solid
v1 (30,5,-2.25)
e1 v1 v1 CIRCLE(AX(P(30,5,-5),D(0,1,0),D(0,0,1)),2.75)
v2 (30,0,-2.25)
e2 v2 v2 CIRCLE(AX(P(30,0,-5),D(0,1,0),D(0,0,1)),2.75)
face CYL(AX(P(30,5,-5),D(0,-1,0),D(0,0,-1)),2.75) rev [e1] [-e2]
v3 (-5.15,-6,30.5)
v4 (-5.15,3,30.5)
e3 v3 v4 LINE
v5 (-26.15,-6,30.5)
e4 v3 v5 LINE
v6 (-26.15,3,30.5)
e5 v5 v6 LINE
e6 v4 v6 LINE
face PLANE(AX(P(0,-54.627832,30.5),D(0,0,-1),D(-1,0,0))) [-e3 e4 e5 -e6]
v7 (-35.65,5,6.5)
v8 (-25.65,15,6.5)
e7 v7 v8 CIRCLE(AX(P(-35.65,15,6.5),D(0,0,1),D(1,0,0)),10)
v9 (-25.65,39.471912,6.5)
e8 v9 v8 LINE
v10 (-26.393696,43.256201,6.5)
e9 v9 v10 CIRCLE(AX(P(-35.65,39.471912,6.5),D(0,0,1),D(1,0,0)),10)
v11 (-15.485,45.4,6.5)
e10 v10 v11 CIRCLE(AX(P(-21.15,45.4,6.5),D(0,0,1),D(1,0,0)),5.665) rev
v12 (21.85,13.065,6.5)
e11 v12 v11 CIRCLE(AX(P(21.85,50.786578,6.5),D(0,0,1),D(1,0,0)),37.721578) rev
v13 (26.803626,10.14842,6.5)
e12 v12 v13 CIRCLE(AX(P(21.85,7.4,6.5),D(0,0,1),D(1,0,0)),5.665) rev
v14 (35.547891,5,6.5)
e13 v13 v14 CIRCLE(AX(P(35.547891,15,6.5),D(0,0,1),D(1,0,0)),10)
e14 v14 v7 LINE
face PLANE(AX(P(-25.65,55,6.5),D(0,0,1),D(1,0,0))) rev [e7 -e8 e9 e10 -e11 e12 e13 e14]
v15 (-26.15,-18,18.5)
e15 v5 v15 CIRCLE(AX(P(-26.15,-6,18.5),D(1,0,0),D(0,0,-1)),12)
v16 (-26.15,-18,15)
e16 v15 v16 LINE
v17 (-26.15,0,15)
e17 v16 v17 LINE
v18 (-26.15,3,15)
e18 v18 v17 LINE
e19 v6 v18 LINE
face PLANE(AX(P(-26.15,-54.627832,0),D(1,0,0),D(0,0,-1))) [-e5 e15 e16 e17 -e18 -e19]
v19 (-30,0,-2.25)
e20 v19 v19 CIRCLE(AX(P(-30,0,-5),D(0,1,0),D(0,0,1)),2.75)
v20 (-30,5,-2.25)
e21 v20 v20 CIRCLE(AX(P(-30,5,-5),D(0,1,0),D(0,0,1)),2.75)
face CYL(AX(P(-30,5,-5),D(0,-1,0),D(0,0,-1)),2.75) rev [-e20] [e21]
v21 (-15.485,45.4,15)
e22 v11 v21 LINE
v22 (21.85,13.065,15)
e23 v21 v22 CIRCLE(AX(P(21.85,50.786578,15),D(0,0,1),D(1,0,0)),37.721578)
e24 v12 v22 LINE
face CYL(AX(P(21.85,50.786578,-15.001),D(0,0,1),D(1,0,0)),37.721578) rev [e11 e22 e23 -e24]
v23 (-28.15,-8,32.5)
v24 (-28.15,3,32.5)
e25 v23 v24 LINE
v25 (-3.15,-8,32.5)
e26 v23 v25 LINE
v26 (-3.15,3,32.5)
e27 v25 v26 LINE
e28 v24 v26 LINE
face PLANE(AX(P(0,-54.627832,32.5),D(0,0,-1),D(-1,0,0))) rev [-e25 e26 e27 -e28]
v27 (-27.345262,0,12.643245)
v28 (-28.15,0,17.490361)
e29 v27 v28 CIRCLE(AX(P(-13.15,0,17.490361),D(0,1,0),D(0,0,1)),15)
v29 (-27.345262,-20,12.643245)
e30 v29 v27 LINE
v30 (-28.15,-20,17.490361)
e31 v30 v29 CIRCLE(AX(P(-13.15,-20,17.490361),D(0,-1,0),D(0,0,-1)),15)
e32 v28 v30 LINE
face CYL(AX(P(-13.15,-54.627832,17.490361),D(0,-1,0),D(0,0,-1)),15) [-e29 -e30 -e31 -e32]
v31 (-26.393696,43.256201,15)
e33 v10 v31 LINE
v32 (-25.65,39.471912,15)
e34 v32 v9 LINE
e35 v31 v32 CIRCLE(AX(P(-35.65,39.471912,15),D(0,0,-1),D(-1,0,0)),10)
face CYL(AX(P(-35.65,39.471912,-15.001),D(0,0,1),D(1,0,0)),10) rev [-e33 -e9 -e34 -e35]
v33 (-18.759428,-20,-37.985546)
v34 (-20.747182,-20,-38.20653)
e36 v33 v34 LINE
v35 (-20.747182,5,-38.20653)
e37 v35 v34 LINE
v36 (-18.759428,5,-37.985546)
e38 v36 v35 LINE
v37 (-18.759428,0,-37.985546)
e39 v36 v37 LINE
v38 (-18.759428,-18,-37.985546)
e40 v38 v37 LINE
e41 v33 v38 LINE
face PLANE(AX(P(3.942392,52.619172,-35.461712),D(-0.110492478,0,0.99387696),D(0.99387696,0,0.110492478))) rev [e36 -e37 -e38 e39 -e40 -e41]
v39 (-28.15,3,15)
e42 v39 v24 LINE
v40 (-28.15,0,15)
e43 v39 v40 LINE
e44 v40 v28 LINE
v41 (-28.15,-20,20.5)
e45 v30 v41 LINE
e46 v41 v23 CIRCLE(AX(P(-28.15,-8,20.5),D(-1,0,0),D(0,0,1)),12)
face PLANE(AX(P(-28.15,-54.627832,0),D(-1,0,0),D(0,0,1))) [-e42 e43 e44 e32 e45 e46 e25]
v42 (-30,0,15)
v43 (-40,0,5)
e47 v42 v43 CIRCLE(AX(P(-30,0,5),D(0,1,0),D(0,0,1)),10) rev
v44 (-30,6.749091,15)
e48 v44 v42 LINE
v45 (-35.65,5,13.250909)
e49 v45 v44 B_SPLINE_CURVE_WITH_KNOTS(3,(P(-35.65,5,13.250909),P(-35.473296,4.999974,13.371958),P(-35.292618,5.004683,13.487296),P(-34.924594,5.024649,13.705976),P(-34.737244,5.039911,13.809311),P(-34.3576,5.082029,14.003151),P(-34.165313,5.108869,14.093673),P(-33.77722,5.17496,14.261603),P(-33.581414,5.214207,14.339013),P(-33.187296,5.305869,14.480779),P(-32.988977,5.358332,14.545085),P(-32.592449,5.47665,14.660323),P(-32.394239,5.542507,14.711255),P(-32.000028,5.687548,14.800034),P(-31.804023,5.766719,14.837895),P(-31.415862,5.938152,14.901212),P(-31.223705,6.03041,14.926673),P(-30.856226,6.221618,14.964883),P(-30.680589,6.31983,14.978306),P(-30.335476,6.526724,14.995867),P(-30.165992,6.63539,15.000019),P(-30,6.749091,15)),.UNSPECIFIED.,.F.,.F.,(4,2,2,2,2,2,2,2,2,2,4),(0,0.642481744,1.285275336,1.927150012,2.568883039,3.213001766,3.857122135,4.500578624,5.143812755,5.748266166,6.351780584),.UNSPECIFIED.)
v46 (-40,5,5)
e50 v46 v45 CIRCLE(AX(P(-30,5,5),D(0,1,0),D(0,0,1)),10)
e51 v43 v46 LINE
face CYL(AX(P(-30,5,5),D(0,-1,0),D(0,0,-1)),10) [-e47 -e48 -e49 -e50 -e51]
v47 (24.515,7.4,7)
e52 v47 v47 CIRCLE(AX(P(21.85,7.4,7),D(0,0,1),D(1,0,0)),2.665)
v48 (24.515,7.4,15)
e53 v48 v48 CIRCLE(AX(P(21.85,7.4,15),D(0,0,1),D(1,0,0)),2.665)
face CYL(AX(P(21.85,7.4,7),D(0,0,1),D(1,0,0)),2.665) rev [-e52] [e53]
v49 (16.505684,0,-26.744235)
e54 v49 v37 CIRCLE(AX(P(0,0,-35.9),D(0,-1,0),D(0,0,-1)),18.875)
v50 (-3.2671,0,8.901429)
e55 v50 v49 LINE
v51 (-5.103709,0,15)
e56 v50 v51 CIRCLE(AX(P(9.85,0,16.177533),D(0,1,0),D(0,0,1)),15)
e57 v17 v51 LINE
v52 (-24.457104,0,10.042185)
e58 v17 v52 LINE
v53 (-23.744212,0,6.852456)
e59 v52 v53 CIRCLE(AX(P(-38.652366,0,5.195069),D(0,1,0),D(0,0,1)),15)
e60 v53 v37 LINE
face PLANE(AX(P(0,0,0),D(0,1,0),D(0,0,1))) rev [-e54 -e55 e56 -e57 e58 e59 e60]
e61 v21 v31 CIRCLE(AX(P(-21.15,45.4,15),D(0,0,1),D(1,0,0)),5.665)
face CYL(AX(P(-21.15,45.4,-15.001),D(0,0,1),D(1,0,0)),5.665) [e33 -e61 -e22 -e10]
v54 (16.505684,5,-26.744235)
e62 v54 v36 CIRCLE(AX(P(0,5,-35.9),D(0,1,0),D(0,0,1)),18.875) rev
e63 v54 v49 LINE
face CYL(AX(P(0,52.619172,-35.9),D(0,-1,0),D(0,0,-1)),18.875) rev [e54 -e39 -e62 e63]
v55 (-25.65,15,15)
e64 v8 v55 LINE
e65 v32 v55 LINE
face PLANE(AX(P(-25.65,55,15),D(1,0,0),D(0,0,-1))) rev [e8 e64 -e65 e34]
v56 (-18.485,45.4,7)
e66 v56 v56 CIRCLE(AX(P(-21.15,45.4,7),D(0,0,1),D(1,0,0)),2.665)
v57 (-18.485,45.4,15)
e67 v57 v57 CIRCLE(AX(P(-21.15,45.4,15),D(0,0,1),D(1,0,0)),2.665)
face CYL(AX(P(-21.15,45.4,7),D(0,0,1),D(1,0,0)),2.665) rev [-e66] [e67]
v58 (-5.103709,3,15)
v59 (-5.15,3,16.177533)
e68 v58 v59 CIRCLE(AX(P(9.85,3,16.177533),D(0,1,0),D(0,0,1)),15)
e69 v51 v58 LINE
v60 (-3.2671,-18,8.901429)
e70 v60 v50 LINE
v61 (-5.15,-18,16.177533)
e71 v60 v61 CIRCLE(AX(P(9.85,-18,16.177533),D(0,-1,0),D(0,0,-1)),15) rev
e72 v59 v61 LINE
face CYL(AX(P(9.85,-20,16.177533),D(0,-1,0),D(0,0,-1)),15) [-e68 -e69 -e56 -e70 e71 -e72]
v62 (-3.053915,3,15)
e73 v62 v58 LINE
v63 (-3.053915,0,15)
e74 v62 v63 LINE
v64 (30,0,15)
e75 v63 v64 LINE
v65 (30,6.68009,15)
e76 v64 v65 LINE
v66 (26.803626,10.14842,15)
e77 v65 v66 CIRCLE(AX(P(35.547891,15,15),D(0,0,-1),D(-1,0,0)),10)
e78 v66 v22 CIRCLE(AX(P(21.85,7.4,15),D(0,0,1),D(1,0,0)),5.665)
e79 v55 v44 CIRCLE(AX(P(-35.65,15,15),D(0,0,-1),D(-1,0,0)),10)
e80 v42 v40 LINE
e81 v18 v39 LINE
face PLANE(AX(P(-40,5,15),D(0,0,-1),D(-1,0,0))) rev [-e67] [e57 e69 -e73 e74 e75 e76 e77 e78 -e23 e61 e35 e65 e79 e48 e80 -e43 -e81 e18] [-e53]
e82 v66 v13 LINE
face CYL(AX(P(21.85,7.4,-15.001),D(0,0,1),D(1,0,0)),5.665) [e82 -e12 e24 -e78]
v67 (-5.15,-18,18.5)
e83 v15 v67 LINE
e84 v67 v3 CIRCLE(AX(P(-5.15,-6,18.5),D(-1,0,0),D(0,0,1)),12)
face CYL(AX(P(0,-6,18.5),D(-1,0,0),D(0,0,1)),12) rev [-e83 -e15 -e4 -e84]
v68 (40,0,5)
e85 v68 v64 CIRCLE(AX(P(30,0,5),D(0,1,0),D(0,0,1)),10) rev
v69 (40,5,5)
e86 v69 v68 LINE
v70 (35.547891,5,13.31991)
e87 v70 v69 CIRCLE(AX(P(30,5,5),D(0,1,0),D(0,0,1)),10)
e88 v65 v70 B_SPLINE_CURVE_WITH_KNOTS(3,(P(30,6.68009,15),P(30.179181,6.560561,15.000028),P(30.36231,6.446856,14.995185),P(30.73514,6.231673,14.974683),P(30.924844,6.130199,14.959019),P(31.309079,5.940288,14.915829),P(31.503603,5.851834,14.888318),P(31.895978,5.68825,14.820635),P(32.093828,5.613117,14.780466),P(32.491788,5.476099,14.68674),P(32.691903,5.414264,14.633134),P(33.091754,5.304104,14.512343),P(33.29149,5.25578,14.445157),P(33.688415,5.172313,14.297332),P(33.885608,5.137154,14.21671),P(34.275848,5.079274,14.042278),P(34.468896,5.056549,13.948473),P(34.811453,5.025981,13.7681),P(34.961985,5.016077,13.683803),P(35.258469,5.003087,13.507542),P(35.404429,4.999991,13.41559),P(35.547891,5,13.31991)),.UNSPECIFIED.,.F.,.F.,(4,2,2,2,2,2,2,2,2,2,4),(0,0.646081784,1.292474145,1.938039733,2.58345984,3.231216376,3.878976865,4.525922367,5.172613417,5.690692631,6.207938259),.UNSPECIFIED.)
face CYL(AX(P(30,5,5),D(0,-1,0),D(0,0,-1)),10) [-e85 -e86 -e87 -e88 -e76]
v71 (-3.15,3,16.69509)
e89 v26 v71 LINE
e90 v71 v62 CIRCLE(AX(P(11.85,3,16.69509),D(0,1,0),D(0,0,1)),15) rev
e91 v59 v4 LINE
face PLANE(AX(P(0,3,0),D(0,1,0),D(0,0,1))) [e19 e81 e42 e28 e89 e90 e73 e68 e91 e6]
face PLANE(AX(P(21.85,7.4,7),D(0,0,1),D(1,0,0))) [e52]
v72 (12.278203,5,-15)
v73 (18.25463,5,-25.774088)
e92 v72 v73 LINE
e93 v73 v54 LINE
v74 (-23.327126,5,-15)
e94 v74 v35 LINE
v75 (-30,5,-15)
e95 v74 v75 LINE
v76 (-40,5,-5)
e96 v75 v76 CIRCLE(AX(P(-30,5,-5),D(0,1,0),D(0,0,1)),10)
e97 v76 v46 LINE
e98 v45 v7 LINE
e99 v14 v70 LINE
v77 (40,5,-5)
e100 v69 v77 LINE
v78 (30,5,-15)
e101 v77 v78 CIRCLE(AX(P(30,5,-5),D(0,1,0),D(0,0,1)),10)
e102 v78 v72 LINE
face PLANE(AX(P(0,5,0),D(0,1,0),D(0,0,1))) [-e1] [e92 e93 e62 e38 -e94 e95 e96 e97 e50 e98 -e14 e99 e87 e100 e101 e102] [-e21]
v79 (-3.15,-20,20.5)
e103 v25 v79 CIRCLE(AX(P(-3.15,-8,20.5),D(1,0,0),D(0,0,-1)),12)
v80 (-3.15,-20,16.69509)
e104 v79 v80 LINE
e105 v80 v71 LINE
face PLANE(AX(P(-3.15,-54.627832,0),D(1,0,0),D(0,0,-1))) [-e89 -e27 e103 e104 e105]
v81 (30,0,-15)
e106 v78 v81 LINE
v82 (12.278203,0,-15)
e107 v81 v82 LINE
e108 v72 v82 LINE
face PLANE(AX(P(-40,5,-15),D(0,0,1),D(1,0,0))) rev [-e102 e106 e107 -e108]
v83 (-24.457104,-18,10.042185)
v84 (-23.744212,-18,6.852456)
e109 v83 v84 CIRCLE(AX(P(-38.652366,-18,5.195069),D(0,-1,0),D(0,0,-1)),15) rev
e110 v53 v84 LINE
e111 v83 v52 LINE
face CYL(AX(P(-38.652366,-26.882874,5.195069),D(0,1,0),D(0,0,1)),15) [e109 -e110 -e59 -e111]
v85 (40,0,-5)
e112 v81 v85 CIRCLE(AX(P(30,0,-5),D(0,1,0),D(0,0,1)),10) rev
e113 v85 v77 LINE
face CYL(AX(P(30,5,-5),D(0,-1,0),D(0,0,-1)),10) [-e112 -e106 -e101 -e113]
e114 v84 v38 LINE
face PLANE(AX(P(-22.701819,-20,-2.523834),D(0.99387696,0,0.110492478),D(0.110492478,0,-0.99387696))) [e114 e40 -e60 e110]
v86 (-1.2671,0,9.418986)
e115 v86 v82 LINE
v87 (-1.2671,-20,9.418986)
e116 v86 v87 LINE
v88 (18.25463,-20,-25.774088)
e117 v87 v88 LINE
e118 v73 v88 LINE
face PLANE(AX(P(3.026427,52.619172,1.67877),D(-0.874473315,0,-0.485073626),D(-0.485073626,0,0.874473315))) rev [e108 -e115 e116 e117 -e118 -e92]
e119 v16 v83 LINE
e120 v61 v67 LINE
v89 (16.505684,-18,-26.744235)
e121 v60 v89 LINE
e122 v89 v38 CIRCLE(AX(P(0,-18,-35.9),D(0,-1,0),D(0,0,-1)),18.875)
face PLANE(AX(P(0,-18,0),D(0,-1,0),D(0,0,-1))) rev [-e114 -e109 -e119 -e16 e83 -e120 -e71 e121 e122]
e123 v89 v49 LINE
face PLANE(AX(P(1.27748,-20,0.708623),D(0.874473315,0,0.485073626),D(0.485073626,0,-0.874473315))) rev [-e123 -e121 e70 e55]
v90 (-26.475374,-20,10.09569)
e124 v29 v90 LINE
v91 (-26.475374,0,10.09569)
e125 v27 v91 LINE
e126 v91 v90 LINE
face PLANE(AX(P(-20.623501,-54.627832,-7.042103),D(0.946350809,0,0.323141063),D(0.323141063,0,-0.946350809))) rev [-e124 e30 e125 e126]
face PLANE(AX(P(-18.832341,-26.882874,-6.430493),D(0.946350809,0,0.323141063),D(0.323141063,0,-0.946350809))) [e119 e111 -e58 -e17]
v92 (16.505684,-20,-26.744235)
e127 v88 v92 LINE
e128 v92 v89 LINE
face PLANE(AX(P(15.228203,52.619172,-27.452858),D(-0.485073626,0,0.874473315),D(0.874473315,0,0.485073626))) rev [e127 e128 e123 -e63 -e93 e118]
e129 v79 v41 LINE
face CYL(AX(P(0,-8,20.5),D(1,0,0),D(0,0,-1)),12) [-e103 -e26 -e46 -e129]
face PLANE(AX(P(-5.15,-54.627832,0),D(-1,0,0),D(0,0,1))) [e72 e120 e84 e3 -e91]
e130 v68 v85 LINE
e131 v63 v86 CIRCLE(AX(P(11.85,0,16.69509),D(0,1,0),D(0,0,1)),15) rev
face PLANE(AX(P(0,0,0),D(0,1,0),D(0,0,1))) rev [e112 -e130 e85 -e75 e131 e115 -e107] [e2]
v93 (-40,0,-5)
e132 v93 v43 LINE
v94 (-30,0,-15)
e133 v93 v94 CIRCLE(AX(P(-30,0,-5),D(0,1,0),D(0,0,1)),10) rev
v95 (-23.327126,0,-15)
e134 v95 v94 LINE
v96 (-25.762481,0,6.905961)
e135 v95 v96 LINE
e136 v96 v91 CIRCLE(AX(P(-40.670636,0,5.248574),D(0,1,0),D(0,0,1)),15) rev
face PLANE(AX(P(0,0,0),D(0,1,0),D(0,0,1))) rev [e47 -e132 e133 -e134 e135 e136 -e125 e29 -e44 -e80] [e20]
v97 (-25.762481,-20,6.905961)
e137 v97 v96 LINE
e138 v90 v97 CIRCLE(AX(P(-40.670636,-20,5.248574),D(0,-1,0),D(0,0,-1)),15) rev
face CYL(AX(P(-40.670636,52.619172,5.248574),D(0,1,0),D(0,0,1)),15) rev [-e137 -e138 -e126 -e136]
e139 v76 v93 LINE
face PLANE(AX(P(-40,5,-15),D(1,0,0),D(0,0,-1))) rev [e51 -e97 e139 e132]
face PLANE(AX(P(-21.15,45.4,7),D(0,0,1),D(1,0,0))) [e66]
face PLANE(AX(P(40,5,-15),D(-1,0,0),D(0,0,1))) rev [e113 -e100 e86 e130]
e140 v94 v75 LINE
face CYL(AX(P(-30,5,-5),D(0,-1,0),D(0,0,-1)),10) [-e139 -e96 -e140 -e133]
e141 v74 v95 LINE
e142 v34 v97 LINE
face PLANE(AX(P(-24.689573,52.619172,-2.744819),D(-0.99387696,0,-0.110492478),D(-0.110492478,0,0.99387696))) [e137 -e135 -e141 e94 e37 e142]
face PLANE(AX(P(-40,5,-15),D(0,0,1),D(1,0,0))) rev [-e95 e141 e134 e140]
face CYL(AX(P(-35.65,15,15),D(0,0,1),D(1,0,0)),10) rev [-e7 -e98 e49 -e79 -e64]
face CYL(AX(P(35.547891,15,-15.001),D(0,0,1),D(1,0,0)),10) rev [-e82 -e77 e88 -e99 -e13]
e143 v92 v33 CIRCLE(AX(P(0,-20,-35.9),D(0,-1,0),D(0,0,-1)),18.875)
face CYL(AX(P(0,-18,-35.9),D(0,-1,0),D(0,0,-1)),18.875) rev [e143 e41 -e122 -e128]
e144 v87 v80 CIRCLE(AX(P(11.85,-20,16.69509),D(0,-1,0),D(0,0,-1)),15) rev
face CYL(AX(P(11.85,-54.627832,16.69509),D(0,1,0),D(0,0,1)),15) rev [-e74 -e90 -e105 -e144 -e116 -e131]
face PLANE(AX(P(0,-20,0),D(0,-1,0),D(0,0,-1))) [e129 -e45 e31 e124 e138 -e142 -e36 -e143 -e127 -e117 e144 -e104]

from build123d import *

# Parameters (mm, degrees)
SKETCH1_W           = 80
SKETCH1_H           = 30
SKETCH1_R           = 2.75
BOSS_EXTRUDE1_DEPTH = 5
SKETCH2_W           = 51.3
SKETCH2_H           = 8.5
BOSS_EXTRUDE2_DEPTH = 50
SKETCH3_R           = 2.665
CUT_EXTRUDE1_DEPTH  = 8
CUT_EXTRUDE2_REACH  = 76.33
BOSS_EXTRUDE3_DEPTH = 8.5
FILLET1_START       = 6.5
FILLET1_DEPTH       = 8.5
FILLET2_R           = 10
BOSS_EXTRUDE5_DEPTH = 5
BOSS_EXTRUDE6_DEPTH = 20
BOSS_EXTRUDE7_DEPTH = 20
CUT_EXTRUDE3_DEPTH  = 20
BOSS_EXTRUDE8_DEPTH = 3
FILLET4_START       = -20
FILLET4_DEPTH       = 20
FILLET4_2_DEPTH     = 4
FILLET4_3_DEPTH     = 23
BOSS_EXTRUDE9_DEPTH = 2
FILLET5_R           = 12


with BuildPart() as part:
    # Sketch1 → Boss-Extrude1 (new body)
    with BuildSketch(Plane(origin=(0, 0, 0), x_dir=(1, 0, 0), z_dir=(0, 1, 0))):
        Rectangle(SKETCH1_W, SKETCH1_H)
        with Locations(Location((30, 5, 0), (0, 0, 270))):
            Circle(SKETCH1_R, mode=Mode.SUBTRACT)
        with Locations(Location((-30, 5, 0), (0, 0, 270))):
            Circle(SKETCH1_R, mode=Mode.SUBTRACT)
    extrude(amount=BOSS_EXTRUDE1_DEPTH)

    # Sketch2 → Boss-Extrude2 (add)
    with BuildSketch(Plane(origin=(0, 5, 0), x_dir=(1, 0, 0), z_dir=(0, 1, 0))):
        with Locations((0, -10.75)):
            Rectangle(SKETCH2_W, SKETCH2_H)
    extrude(amount=BOSS_EXTRUDE2_DEPTH)

    # Sketch3 → Cut-Extrude1 (cut)
    with BuildSketch(Plane.XY.offset(15)):
        with Locations((21.85, 7.4)):
            Circle(SKETCH3_R)
        with Locations((-21.15, 45.4)):
            Circle(SKETCH3_R)
    extrude(amount=-CUT_EXTRUDE1_DEPTH, mode=Mode.SUBTRACT)

    # Sketch5 → Cut-Extrude2 (cut, up to next)
    with BuildSketch(Plane.XY.offset(15), mode=Mode.PRIVATE) as cut_extrude2_sk1:
        with BuildLine():
            ThreePointArc((-15.485, 45.4), (-2.845416832, 22.272479127), (21.85, 13.065))
            ThreePointArc((21.85, 13.065), (23.886047867, 12.68646707), (25.65, 11.601455105))
            Line((25.65, 11.601455105), (25.65, 55))
            Line((25.65, 55), (-25.65, 55))
            Line((-25.65, 55), (-25.65, 48.841253405))
            ThreePointArc((-25.65, 48.841253405), (-19.333447634, 50.765851517), (-15.485, 45.4))
        make_face()
    cut_extrude2_tool1 = extrude(cut_extrude2_sk1.sketch, amount=-CUT_EXTRUDE2_REACH, mode=Mode.PRIVATE) & part.part
    add(cut_extrude2_tool1.solids().sort_by_distance((6.645392, 37.171167, 15))[0], mode=Mode.SUBTRACT)

    # Sketch5<3> → Boss-Extrude3 (add)
    with BuildSketch(Plane.XY.offset(15)):
        with BuildLine():
            Line((25.65, 5), (26.981493447, 5))
            ThreePointArc((26.981493447, 5), (27.380015162, 6.170708615), (27.515, 7.4))
            ThreePointArc((27.515, 7.4), (27.027799967, 9.698393461), (25.65, 11.601455105))
            Line((25.65, 11.601455105), (25.65, 5))
        make_face()
        with BuildLine():
            ThreePointArc((-25.65, 48.841253405), (-26.815, 45.4), (-25.65, 41.958746595))
            Line((-25.65, 41.958746595), (-25.65, 48.841253405))
        make_face()
    extrude(amount=-BOSS_EXTRUDE3_DEPTH)

    # Fillet1: read off the stored shape, not the designer's step
    # Fillet1 outline → Fillet1 (add)
    with BuildSketch(Plane.XY.offset(FILLET1_START)):
        with BuildLine():
            ThreePointArc((-26.393696138, 43.256200613), (-25.837685324, 41.400248446), (-25.65, 39.471912197))
            Line((-25.65, 39.471912197), (-25.65, 41.958746595))
            ThreePointArc((-25.65, 41.958746595), (-26.064849981, 42.582825057), (-26.393696138, 43.256200613))
        make_face()
        with BuildLine():
            Line((-35.65, 5), (-25.65, 5))
            Line((-25.65, 5), (-25.65, 15))
            ThreePointArc((-25.65, 15), (-28.578932188, 7.928932188), (-35.65, 5))
        make_face()
        with BuildLine():
            ThreePointArc((35.547891261, 5), (30.474223926, 6.382697651), (26.803626173, 10.148420045))
            ThreePointArc((26.803626173, 10.148420045), (27.511622265, 7.595597351), (26.981493447, 5))
            Line((26.981493447, 5), (35.547891261, 5))
        make_face()
    extrude(amount=FILLET1_DEPTH)

    # Fillet2
    fillet2_edges = [part.edges().sort_by_distance(p)[0] for p in [
        (40, 2.5, 15),
        (40, 2.5, -15),
        (-40, 2.5, -15),
        (-40, 2.5, 15),
    ]]
    fillet(fillet2_edges, radius=FILLET2_R)

    # Sketch7 → Boss-Extrude5 (add)
    with BuildSketch(Plane.XZ):
        with BuildLine():
            Line((16.505683811, -26.744235317), (9.991112457, -15))
            Line((9.991112457, -15), (-21.314804171, -15))
            Line((-21.314804171, -15), (-18.759427627, -37.985545514))
            ThreePointArc((-18.759427627, -37.985545514), (-5.732504168, -17.916562593), (16.505683811, -26.744235317))
        make_face()
        Polygon((-18.759427627, -37.985545514), (-21.314804171, -15), (-23.327125696, -15), (-20.747181548, -38.206530469), align=None)
        Polygon((12.278203403, -15), (9.991112457, -15), (16.505683811, -26.744235317), (18.25463044, -25.774088066), align=None)
    extrude(amount=-BOSS_EXTRUDE5_DEPTH)

    # Sketch7<6> → Boss-Extrude6 (add)
    with BuildSketch(Plane.XZ):
        Polygon((-4.362909054, 15), (-6.65, 15), (9.991112457, -15), (12.278203403, -15), align=None)
        Polygon((12.278203403, -15), (9.991112457, -15), (16.505683811, -26.744235317), (18.25463044, -25.774088066), align=None)
        Polygon((-21.314804171, -15), (-24.650000035, 15), (-26.662321559, 15), (-26.637753956, 14.779015045), (-23.327125696, -15), align=None)
        Polygon((-18.759427627, -37.985545514), (-21.314804171, -15), (-23.327125696, -15), (-20.747181548, -38.206530469), align=None)
    extrude(amount=BOSS_EXTRUDE6_DEPTH)

    # Sketch8 → Boss-Extrude7 (add)
    with BuildSketch(Plane.XZ):
        Polygon((-5.15, 30.5), (-5.15, 22), (-5.15, 15), (-4.362909054, 15), (-3.15, 15), (-3.15, 22), (-3.15, 32.5), (-28.15, 32.5), (-28.15, 22), (-28.15, 15), (-25.9441307, 8.539891907), (-26.662321559, 15), (-26.15, 15), (-26.15, 22), (-26.15, 30.5), align=None)
        Polygon((-3.15, 15), (-4.362909054, 15), (-3.15, 12.813411109), align=None)
    extrude(amount=BOSS_EXTRUDE7_DEPTH)

    # Sketch8<3> → Cut-Extrude3 (cut)
    with BuildSketch(Plane.XZ):
        Polygon((-23.925860843, 8.48638681), (-24.650000035, 15), (-26.15, 15), align=None)
        Polygon((-6.65, 15), (-5.15, 15), (-5.15, 12.295853861), align=None)
    extrude(amount=CUT_EXTRUDE3_DEPTH, mode=Mode.SUBTRACT)

    # Sketch9 → Boss-Extrude8 (add)
    with BuildSketch(Plane(origin=(0, 0, 0), x_dir=(1, 0, 0), z_dir=(0, 1, 0))):
        Polygon((-3.15, -32.5), (-3.15, -15), (-5.15, -15), (-5.15, -30.5), (-26.15, -30.5), (-26.15, -15), (-28.15, -15), (-28.15, -32.5), align=None)
    extrude(amount=BOSS_EXTRUDE8_DEPTH)

    # Fillet4: read off the stored shape, not the designer's step
    # Fillet4 outline → Fillet4 (cut)
    with BuildSketch(Plane(origin=(0, 0, 0), x_dir=(1, 0, 0), z_dir=(0, 1, 0)).offset(FILLET4_START)):
        with BuildLine():
            ThreePointArc((-5.15, -16.177533225), (-4.671647561, -12.419641247), (-3.267099718, -8.901428842))
            Line((-3.267099718, -8.901428842), (-5.15, -12.295853861))
            Line((-5.15, -12.295853861), (-5.15, -16.177533225))
        make_face()
        with BuildLine():
            ThreePointArc((-28.15, -17.490360897), (-27.947447955, -15.033628513), (-27.345262132, -12.643244951))
            Line((-27.345262132, -12.643244951), (-28.15, -15))
            Line((-28.15, -15), (-28.15, -17.490360897))
        make_face()
        with BuildLine():
            ThreePointArc((-23.744211533, -6.852455992), (-24.013520151, -8.466795288), (-24.457103806, -10.042184774))
            Line((-24.457103806, -10.042184774), (-23.925860843, -8.48638681))
            Line((-23.925860843, -8.48638681), (-23.744211533, -6.852455992))
        make_face()
    extrude(amount=FILLET4_DEPTH, mode=Mode.SUBTRACT)

    # Fillet4 2 outline → Fillet4 2 (cut)
    with BuildSketch(Plane(origin=(0, 0, 0), x_dir=(1, 0, 0), z_dir=(0, 1, 0))):
        with BuildLine():
            Line((-5.15, -15), (-5.15, -16.177533225))
            ThreePointArc((-5.15, -16.177533225), (-5.138422804, -15.588311844), (-5.103709089, -15))
            Line((-5.103709089, -15), (-5.15, -15))
        make_face()
    extrude(amount=FILLET4_2_DEPTH, mode=Mode.SUBTRACT)

    # Fillet4 3 outline → Fillet4 3 (add)
    with BuildSketch(Plane(origin=(0, 0, 0), x_dir=(1, 0, 0), z_dir=(0, 1, 0)).offset(FILLET4_START)):
        with BuildLine():
            ThreePointArc((-25.76248139, -6.905961089), (-26.031790008, -8.520300385), (-26.475373663, -10.095689871))
            Line((-26.475373663, -10.095689871), (-25.9441307, -8.539891907))
            Line((-25.9441307, -8.539891907), (-25.76248139, -6.905961089))
        make_face()
        with BuildLine():
            Line((-3.15, -12.813411109), (-3.15, -16.695090474))
            ThreePointArc((-3.15, -16.695090474), (-2.671647561, -12.937198496), (-1.267099718, -9.41898609))
            Line((-1.267099718, -9.41898609), (-3.15, -12.813411109))
        make_face()
    extrude(amount=FILLET4_3_DEPTH)

    # Sketch10 → Boss-Extrude9 (add)
    with BuildSketch(Plane.XZ.offset(20)):
        with BuildLine():
            ThreePointArc((16.505683811, -26.744235317), (-5.732504168, -17.916562593), (-18.759427627, -37.985545514))
            Line((-18.759427627, -37.985545514), (-23.744211533, 6.852455992))
            ThreePointArc((-23.744211533, 6.852455992), (-24.013520151, 8.466795288), (-24.457103806, 10.042184774))
            Line((-24.457103806, 10.042184774), (-26.15, 15))
            Line((-26.15, 15), (-26.15, 30.5))
            Line((-26.15, 30.5), (-5.15, 30.5))
            Line((-5.15, 30.5), (-5.15, 16.177533225))
            ThreePointArc((-5.15, 16.177533225), (-4.671647561, 12.419641247), (-3.267099718, 8.901428842))
            Line((-3.267099718, 8.901428842), (16.505683811, -26.744235317))
        make_face()
        with BuildLine():
            Line((-26.15, 30.5), (-5.15, 30.5))
            Line((-5.15, 30.5), (-5.15, 16.177533225))
            ThreePointArc((-5.15, 16.177533225), (-4.671647561, 12.419641247), (-3.267099718, 8.901428842))
            Line((-3.267099718, 8.901428842), (16.505683811, -26.744235317))
            Line((16.505683811, -26.744235317), (18.25463044, -25.774088066))
            Line((18.25463044, -25.774088066), (-1.267099718, 9.41898609))
            ThreePointArc((-1.267099718, 9.41898609), (-2.671647561, 12.937198496), (-3.15, 16.695090474))
            Line((-3.15, 16.695090474), (-3.15, 32.5))
            Line((-3.15, 32.5), (-28.15, 32.5))
            Line((-28.15, 32.5), (-28.15, 17.490360897))
            ThreePointArc((-28.15, 17.490360897), (-27.947447955, 15.033628513), (-27.345262132, 12.643244951))
            Line((-27.345262132, 12.643244951), (-26.475373663, 10.095689871))
            ThreePointArc((-26.475373663, 10.095689871), (-26.031790008, 8.520300385), (-25.76248139, 6.905961089))
            Line((-25.76248139, 6.905961089), (-20.747181548, -38.206530469))
            Line((-20.747181548, -38.206530469), (-18.759427627, -37.985545514))
            Line((-18.759427627, -37.985545514), (-23.744211533, 6.852455992))
            ThreePointArc((-23.744211533, 6.852455992), (-24.013520151, 8.466795288), (-24.457103806, 10.042184774))
            Line((-24.457103806, 10.042184774), (-26.15, 15))
            Line((-26.15, 15), (-26.15, 30.5))
        make_face()
    extrude(amount=-BOSS_EXTRUDE9_DEPTH)

    # Fillet5
    fillet5_edges = [part.edges().sort_by_distance(p)[0] for p in [
        (-15.65, -20, 32.5),
        (-15.65, -18, 30.5),
    ]]
    fillet(fillet5_edges, radius=FILLET5_R)


solid = part.part
